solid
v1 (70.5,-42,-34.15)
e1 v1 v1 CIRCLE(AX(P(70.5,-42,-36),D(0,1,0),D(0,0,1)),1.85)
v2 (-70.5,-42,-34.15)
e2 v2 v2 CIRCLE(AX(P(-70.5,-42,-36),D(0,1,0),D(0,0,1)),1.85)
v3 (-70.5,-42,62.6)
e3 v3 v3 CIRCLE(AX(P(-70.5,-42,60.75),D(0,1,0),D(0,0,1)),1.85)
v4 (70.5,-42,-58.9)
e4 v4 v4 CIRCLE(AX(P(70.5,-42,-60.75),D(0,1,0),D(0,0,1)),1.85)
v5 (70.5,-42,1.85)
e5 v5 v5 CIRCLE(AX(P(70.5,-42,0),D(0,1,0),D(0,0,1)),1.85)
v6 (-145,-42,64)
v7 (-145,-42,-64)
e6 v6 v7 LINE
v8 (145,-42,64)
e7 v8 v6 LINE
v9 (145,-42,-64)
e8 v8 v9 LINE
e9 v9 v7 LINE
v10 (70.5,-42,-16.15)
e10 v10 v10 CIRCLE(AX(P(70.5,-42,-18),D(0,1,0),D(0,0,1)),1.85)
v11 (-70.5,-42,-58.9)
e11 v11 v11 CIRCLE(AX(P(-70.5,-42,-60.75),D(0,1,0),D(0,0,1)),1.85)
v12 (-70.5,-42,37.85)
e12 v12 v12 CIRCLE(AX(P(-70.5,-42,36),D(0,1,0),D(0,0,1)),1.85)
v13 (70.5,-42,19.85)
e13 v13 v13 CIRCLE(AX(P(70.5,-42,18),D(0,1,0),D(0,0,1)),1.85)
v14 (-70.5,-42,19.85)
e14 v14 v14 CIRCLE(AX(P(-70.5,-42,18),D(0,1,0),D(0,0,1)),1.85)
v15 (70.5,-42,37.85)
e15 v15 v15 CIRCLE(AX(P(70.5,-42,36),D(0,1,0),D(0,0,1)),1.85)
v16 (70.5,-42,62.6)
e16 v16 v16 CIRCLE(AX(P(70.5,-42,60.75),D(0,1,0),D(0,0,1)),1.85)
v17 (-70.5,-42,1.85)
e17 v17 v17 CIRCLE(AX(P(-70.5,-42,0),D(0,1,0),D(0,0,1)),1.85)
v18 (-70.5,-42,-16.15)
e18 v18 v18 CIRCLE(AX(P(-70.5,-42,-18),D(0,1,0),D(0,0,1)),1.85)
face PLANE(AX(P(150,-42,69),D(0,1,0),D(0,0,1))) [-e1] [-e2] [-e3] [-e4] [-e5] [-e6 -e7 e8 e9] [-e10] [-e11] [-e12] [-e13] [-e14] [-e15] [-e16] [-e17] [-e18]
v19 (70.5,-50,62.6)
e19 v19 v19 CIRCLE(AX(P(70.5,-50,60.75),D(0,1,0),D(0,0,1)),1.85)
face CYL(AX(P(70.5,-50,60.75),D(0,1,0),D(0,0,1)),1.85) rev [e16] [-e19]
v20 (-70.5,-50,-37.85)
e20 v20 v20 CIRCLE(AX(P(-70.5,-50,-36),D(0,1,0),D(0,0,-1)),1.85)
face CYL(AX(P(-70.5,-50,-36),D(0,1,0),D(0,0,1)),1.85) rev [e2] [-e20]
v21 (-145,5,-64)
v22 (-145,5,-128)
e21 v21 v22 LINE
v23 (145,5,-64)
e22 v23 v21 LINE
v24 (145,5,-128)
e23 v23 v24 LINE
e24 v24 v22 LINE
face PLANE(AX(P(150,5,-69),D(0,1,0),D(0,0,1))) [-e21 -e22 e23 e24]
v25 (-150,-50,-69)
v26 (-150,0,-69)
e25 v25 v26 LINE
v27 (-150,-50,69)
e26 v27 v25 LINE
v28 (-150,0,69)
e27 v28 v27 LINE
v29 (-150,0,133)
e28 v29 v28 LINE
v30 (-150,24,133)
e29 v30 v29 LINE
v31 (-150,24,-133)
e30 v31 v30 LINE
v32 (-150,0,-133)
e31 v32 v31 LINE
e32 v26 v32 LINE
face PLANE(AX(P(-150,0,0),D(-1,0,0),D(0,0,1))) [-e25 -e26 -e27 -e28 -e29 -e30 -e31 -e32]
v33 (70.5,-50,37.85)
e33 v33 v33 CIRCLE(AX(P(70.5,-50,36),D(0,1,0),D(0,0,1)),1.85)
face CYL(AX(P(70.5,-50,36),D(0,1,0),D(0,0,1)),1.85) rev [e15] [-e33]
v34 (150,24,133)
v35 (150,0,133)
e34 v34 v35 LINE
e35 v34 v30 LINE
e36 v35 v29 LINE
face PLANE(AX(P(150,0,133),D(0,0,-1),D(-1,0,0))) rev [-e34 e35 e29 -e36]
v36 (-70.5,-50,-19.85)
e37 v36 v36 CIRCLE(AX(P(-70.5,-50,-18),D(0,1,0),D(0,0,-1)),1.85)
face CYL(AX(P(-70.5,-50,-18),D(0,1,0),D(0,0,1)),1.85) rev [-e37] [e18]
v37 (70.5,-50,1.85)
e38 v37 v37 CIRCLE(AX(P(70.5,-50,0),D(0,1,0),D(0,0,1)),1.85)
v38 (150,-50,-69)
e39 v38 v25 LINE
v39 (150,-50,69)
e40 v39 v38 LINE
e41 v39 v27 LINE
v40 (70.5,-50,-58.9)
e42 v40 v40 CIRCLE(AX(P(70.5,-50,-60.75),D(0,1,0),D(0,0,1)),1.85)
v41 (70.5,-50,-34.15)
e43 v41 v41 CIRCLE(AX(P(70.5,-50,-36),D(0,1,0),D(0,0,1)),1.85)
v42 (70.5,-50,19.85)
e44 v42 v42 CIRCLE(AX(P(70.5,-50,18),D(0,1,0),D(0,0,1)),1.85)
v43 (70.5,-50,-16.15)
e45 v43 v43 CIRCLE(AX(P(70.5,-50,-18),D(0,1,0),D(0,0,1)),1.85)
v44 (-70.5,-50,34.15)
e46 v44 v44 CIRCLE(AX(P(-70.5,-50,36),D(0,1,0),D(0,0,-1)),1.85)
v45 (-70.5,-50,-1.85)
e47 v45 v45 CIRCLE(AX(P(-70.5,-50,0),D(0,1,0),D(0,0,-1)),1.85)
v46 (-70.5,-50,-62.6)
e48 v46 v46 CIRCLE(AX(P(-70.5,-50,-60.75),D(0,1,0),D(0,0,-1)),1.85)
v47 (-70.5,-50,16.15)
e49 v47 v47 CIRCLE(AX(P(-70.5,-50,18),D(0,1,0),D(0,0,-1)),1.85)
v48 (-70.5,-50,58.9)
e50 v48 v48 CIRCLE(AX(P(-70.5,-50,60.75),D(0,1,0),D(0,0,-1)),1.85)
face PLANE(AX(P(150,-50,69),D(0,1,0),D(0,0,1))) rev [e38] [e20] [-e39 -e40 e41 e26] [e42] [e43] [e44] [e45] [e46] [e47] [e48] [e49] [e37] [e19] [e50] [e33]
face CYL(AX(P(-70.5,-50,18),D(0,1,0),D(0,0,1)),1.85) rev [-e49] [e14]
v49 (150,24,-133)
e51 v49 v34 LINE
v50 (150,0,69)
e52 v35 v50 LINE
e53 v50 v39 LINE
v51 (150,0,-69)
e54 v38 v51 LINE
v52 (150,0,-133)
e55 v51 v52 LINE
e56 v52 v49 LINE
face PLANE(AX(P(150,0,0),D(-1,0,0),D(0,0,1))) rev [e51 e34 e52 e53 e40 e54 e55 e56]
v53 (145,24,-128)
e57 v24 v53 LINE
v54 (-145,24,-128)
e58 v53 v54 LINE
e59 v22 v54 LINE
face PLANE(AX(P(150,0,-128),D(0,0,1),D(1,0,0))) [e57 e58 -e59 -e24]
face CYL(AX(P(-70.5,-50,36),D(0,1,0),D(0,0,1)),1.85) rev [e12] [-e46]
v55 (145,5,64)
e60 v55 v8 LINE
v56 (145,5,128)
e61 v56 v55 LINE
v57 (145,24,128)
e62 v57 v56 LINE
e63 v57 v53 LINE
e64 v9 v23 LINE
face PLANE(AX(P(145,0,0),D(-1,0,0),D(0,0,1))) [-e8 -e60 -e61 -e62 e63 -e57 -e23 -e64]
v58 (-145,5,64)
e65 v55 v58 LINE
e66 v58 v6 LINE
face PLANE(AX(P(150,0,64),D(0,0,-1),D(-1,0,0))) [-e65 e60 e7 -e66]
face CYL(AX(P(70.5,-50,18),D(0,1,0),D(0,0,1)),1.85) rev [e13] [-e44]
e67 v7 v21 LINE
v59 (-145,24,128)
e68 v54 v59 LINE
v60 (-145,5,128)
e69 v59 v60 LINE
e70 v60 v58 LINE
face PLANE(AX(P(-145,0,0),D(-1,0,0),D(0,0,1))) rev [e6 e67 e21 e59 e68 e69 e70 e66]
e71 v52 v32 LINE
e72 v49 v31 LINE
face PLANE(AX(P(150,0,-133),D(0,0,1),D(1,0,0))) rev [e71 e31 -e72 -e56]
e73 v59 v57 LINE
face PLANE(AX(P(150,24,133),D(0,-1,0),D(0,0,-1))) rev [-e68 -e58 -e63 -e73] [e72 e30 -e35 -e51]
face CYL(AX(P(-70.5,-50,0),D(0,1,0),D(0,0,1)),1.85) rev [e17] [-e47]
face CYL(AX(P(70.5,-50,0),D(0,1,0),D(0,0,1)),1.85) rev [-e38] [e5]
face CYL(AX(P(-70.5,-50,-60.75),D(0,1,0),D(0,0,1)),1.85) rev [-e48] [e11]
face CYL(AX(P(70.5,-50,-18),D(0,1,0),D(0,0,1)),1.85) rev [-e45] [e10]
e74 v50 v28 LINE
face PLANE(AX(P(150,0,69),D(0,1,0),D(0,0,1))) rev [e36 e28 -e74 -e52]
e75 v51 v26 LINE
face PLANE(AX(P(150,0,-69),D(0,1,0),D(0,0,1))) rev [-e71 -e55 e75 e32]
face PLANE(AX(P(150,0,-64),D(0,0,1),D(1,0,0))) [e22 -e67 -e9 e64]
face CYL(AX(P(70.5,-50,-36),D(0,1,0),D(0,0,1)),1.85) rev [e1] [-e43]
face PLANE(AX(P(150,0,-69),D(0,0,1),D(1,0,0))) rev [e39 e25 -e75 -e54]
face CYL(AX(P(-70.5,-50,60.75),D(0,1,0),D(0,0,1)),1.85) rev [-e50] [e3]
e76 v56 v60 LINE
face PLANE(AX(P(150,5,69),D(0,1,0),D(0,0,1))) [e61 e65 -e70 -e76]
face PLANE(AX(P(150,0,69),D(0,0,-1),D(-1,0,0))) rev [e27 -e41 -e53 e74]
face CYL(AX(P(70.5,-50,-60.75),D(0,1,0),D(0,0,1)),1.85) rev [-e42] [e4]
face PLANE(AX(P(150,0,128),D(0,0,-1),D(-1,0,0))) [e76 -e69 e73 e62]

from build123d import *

# Parameters (mm, degrees)
BOSS_EXTRUDE1_DEPTH = 150
SHELL1_START        = -42
SHELL1_OUTLINE_W    = 290
SHELL1_OUTLINE_H    = 128
SHELL1_DEPTH        = 61
SHELL1_START_2      = 5
SHELL1_2_OUTLINE_W  = 290
SHELL1_2_OUTLINE_H  = 64
SHELL1_2_DEPTH      = 14
SKETCH2_R           = 1.85
CUT_EXTRUDE2_DEPTH  = 207.613165118
SKETCH3_W           = 290
SKETCH3_H           = 256
CUT_EXTRUDE3_DEPTH  = 5


# Read off the part's stored shape, not the designer's step: Shell1
with BuildPart() as part:
    # Sketch1 → Boss-Extrude1 (new, symmetric)
    with BuildSketch(Plane(origin=(0, 0, 0), x_dir=(0, 0, -1), z_dir=(1, 0, 0))):
        Polygon((-69, 0), (-133, 0), (-133, 24), (133, 24), (133, 0), (69, 0), (69, -50), (-69, -50), align=None)
    extrude(amount=BOSS_EXTRUDE1_DEPTH, both=True)

    # Shell1 outline → Shell1 (cut)
    with BuildSketch(Plane(origin=(0, 0, 0), x_dir=(1, 0, 0), z_dir=(0, 1, 0)).offset(SHELL1_START)):
        Rectangle(SHELL1_OUTLINE_W, SHELL1_OUTLINE_H)
    extrude(amount=SHELL1_DEPTH, mode=Mode.SUBTRACT)

    # Shell1 2 outline → Shell1 2 (cut)
    with BuildSketch(Plane(origin=(0, 0, 0), x_dir=(1, 0, 0), z_dir=(0, 1, 0)).offset(SHELL1_START_2)):
        with Locations((0, 96)):
            Rectangle(SHELL1_2_OUTLINE_W, SHELL1_2_OUTLINE_H)
        with Locations((0, -96)):
            Rectangle(SHELL1_2_OUTLINE_W, SHELL1_2_OUTLINE_H)
    extrude(amount=SHELL1_2_DEPTH, mode=Mode.SUBTRACT)

    # Sketch2 → Cut-Extrude2 (cut, through all)
    with BuildSketch(Plane(origin=(0, 0, 0), x_dir=(1, 0, 0), z_dir=(0, 1, 0))):
        with Locations(Location((70.5, 0, 0), (0, 0, 270))):
            Circle(SKETCH2_R)
        with Locations(Location((70.5, 18, 0), (0, 0, 270))):
            Circle(SKETCH2_R)
        with Locations(Location((70.5, 36, 0), (0, 0, 270))):
            Circle(SKETCH2_R)
        with Locations(Location((70.5, -18, 0), (0, 0, 270))):
            Circle(SKETCH2_R)
        with Locations(Location((70.5, -36, 0), (0, 0, 270))):
            Circle(SKETCH2_R)
        with Locations(Location((70.5, -60.75, 0), (0, 0, 270))):
            Circle(SKETCH2_R)
        with Locations(Location((70.5, 60.75, 0), (0, 0, 270))):
            Circle(SKETCH2_R)
        with Locations(Location((-70.5, -60.75, 0), (0, 0, 270))):
            Circle(SKETCH2_R)
        with Locations(Location((-70.5, -36, 0), (0, 0, 270))):
            Circle(SKETCH2_R)
        with Locations(Location((-70.5, -18, 0), (0, 0, 270))):
            Circle(SKETCH2_R)
        with Locations(Location((-70.5, 0, 0), (0, 0, 270))):
            Circle(SKETCH2_R)
        with Locations(Location((-70.5, 18, 0), (0, 0, 270))):
            Circle(SKETCH2_R)
        with Locations(Location((-70.5, 36, 0), (0, 0, 270))):
            Circle(SKETCH2_R)
        with Locations(Location((-70.5, 60.75, 0), (0, 0, 270))):
            Circle(SKETCH2_R)
    extrude(amount=-CUT_EXTRUDE2_DEPTH, mode=Mode.SUBTRACT)

    # Sketch3 → Cut-Extrude3 (cut)
    with BuildSketch(Plane(origin=(0, 24, 0), x_dir=(1, 0, 0), z_dir=(0, 1, 0))):
        Rectangle(SKETCH3_W, SKETCH3_H)
    extrude(amount=-CUT_EXTRUDE3_DEPTH, mode=Mode.SUBTRACT)


solid = part.part
